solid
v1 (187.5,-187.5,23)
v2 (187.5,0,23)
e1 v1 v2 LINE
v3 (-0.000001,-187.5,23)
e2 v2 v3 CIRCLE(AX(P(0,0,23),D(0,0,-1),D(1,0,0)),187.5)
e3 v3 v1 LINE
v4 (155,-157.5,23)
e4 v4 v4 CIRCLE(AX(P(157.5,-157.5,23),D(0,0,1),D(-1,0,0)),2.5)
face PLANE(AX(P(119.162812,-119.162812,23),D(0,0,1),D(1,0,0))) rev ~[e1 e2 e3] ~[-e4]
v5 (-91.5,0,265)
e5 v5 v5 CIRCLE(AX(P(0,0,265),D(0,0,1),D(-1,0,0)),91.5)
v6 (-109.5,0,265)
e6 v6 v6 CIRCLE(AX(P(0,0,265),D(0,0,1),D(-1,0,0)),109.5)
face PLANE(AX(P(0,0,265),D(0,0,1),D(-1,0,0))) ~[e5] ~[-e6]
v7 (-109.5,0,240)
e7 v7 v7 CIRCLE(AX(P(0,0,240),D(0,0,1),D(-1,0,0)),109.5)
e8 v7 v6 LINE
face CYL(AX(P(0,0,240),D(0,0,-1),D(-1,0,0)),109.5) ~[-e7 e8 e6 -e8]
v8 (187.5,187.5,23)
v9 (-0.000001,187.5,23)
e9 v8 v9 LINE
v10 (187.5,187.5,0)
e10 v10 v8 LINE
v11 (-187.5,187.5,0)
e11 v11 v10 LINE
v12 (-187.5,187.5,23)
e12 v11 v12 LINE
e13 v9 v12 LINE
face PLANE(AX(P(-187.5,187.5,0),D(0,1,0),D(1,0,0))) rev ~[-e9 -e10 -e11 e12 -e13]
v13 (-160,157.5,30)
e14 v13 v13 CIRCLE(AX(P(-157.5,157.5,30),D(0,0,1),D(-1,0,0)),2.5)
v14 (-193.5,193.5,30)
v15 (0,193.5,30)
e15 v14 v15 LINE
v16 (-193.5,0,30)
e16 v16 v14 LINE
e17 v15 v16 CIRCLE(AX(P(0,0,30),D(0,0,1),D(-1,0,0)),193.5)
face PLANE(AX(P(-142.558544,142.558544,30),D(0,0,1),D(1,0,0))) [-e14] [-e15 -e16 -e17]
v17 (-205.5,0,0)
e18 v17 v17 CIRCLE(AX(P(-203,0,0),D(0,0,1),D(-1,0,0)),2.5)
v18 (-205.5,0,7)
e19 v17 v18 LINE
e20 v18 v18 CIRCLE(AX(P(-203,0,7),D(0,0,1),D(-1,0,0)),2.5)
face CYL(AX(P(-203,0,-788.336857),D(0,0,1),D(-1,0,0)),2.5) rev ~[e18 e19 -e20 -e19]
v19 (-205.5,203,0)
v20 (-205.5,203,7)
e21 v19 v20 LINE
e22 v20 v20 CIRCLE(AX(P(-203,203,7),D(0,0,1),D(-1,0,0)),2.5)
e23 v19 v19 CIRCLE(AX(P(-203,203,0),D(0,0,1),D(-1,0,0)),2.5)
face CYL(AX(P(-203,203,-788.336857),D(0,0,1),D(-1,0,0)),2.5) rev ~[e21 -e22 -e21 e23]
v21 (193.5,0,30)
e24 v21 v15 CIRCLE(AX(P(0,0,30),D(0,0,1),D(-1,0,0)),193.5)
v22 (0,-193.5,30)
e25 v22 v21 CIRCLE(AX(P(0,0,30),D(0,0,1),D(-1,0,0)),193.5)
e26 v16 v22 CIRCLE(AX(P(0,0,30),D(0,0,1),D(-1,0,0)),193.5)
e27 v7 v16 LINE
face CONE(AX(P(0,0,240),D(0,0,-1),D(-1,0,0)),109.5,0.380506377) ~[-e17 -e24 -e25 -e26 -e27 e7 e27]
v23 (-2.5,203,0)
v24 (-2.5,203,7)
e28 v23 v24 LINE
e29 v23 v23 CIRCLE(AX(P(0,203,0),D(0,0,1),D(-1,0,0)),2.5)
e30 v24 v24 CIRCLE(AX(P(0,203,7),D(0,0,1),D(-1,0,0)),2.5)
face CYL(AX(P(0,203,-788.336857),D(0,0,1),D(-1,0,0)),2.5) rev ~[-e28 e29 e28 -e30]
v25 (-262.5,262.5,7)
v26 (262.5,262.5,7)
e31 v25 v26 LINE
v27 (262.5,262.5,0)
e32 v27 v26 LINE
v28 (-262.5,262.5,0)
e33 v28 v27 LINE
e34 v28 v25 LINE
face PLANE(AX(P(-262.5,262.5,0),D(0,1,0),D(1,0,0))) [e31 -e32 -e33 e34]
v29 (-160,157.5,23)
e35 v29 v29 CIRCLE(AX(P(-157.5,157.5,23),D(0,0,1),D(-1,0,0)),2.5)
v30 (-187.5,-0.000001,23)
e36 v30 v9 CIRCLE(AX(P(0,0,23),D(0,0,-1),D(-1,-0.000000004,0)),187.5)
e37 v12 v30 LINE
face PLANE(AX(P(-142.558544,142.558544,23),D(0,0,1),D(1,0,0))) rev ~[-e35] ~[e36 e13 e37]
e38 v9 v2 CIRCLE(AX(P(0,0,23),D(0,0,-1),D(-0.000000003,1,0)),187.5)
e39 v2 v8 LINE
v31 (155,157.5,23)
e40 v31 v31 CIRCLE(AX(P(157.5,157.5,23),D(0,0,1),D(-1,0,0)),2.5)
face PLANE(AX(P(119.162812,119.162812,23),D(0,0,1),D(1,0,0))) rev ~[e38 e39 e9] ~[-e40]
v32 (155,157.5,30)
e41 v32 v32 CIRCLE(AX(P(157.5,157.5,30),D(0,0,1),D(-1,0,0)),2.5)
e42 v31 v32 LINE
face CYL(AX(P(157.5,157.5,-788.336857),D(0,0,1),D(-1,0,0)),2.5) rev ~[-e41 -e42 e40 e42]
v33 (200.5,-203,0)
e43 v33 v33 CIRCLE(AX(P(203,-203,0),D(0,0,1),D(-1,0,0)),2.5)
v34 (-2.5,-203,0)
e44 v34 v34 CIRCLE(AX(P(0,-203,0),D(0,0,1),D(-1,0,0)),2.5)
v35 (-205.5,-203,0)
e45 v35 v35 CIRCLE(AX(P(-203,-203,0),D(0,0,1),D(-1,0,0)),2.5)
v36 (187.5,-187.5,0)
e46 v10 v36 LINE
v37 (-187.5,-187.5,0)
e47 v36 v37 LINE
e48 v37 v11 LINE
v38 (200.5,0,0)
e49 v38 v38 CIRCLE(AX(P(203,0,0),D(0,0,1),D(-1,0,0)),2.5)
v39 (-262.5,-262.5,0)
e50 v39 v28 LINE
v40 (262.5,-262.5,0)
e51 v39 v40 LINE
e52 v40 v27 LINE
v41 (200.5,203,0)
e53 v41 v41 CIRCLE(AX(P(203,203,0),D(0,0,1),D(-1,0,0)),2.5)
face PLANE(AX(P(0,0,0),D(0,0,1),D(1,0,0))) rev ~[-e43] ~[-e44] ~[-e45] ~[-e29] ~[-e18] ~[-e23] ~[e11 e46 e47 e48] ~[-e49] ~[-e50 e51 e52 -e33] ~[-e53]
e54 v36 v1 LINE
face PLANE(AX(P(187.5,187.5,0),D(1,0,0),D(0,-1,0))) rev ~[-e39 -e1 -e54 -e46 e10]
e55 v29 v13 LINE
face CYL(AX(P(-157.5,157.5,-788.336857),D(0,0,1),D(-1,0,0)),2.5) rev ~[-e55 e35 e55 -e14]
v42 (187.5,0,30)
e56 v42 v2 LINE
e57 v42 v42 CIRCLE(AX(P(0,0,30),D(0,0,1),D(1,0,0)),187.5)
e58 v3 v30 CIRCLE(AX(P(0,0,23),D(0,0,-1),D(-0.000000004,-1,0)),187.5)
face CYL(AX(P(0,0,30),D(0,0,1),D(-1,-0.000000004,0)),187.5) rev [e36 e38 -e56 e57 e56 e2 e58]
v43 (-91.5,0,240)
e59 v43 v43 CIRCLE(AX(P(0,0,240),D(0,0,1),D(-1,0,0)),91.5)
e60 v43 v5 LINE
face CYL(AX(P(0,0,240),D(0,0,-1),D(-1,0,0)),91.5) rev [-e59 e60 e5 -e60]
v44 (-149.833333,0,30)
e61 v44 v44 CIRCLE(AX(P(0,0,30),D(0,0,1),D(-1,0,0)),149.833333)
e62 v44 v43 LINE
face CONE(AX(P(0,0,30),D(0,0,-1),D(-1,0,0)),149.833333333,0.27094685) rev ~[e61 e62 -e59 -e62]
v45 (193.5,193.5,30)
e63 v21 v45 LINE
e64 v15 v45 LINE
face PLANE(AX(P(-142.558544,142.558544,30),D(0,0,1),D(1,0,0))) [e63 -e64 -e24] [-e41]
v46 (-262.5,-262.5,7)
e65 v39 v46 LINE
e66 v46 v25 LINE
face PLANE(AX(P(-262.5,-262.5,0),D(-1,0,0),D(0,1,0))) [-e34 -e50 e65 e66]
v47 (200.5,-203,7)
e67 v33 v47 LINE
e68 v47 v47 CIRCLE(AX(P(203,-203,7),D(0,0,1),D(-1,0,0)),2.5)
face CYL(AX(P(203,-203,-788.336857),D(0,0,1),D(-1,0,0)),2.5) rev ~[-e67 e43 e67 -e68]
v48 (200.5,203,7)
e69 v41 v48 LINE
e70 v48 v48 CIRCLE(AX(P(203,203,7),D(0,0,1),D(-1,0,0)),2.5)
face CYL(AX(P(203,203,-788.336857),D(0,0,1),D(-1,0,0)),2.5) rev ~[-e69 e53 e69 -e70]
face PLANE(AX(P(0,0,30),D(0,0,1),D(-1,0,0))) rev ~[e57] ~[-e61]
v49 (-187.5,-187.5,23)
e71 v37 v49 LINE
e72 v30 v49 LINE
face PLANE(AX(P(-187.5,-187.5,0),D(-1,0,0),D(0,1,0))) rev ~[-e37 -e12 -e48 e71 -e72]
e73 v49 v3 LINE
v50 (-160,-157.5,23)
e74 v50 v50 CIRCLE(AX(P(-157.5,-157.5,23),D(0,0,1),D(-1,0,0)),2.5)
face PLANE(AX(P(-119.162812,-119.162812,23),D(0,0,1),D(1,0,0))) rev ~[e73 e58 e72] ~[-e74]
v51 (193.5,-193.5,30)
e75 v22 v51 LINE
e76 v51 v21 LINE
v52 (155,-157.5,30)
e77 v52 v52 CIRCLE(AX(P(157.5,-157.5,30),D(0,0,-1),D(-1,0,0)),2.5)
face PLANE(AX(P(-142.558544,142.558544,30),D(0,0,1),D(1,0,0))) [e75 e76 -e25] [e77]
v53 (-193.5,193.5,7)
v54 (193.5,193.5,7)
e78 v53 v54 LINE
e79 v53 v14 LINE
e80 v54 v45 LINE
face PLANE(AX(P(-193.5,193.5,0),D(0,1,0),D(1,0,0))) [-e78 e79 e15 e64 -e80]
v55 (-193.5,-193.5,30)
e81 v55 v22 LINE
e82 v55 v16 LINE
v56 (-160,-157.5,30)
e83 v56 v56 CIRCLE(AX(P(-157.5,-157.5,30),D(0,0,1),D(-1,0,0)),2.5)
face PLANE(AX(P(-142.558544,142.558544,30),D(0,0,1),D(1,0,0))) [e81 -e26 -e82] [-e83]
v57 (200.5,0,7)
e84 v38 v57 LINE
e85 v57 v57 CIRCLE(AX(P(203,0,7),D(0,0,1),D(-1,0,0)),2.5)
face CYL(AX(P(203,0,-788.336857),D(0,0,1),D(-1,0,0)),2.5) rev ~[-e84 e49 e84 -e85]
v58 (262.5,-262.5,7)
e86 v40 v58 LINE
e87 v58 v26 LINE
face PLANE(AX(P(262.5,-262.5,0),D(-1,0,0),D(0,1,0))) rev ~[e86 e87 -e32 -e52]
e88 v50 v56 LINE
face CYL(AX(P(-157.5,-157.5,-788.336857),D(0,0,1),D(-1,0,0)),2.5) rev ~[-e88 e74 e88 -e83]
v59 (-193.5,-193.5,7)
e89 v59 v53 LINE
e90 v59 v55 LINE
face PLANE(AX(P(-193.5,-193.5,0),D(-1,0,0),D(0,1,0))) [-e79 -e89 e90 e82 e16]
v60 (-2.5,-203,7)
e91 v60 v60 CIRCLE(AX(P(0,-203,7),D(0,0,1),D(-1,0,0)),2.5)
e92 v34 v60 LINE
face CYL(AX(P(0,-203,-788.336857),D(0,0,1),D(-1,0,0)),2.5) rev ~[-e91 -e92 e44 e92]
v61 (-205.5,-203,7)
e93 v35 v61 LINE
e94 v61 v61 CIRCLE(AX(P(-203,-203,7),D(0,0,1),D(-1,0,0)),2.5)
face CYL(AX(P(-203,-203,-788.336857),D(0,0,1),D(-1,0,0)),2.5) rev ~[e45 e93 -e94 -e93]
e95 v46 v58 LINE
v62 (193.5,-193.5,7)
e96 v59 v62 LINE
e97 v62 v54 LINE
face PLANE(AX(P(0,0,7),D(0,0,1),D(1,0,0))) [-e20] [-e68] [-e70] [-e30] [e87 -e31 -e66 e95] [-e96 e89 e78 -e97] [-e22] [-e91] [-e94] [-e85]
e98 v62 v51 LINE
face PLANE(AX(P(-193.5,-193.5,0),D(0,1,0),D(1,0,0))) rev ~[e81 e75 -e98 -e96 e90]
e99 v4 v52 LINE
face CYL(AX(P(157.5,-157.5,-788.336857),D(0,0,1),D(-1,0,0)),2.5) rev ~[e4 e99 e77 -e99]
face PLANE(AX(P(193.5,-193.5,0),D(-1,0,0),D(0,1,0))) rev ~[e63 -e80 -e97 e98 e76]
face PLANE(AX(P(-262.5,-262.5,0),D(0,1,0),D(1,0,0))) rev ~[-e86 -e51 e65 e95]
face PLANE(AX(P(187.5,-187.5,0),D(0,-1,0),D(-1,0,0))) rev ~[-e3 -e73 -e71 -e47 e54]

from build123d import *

# Parameters (mm, degrees)
F0_W      = 525
F0_H      = 525
F0_W_2    = 387
F0_H_2    = 387
F1_DEPTH  = 7
F2_DEPTH  = 30
F4_DEPTH  = 7
F7_DEPTH  = 25
F8_D      = 5
F9_D      = 5
F10_D     = 5
F11_D     = 5
F12_D     = 5
F13_R     = 2.5
F13_R_2   = 7.5
F14_DEPTH = 10


# Not quite as in the source:
# - a feature names something its author has since deleted; it is built from what else it names


with BuildPart() as f1:
    # F0 (on Top) → F1 (new body)
    with BuildSketch(Plane.XY):
        Rectangle(F0_W, F0_H)
        Rectangle(F0_W_2, F0_H_2, mode=Mode.SUBTRACT)
    extrude(amount=F1_DEPTH)

    # F0 (on Top) → F2 (join)
    with BuildSketch(Plane.XY):
        Rectangle(F0_W_2, F0_H_2)
        Polygon((-187.5, -6.596e-07), (-187.5, 187.5), (-6.149e-07, 187.5), (187.5, 187.5), (187.5, 0), (187.5, -187.5), (-6.893e-07, -187.5), (-187.5, -187.5), align=None, mode=Mode.SUBTRACT)
    extrude(amount=F2_DEPTH)

    # F3 (on face) → F4 (join)
    with BuildSketch(Plane.XY.offset(30)):
        with BuildLine():
            ThreePointArc((-187.5, 47.8121323515), (-136.8251621596, 136.8251621596), (-47.8121323515, 187.5))
            Line((-47.8121323515, 187.5), (-187.5, 187.5))
            Line((-187.5, 187.5), (-187.5, 47.8121323515))
        make_face()
        with BuildLine():
            ThreePointArc((-6.149e-07, 187.5), (132.5825212551, 132.5825216899), (187.5, 0))
            Line((187.5, 0), (187.5, 47.8121323515))
            ThreePointArc((187.5, 47.8121323515), (136.8251621596, 136.8251621596), (47.8121323515, 187.5))
            Line((47.8121323515, 187.5), (-6.149e-07, 187.5))
        make_face()
        with BuildLine():
            ThreePointArc((-187.5, -6.596e-07), (-132.5825219231, 132.5825210219), (-6.149e-07, 187.5))
            Line((-6.149e-07, 187.5), (-47.8121323515, 187.5))
            ThreePointArc((-47.8121323515, 187.5), (-136.8251621596, 136.8251621596), (-187.5, 47.8121323515))
            Line((-187.5, 47.8121323515), (-187.5, -6.596e-07))
        make_face()
        with BuildLine():
            Line((-47.8121323515, -187.5), (-6.893e-07, -187.5))
            ThreePointArc((-6.893e-07, -187.5), (-132.582521483, -132.582521462), (-187.5, -6.596e-07))
            Line((-187.5, -6.596e-07), (-187.5, -47.8121323515))
            ThreePointArc((-187.5, -47.8121323515), (-136.8251621596, -136.8251621596), (-47.8121323515, -187.5))
        make_face()
        with BuildLine():
            Line((187.5, -47.8121323515), (187.5, 0))
            ThreePointArc((187.5, 0), (132.5825212288, -132.5825217162), (-6.893e-07, -187.5))
            Line((-6.893e-07, -187.5), (47.8121323515, -187.5))
            ThreePointArc((47.8121323515, -187.5), (136.8251621596, -136.8251621596), (187.5, -47.8121323515))
        make_face()
        with BuildLine():
            ThreePointArc((47.8121323515, 187.5), (136.8251621596, 136.8251621596), (187.5, 47.8121323515))
            Line((187.5, 47.8121323515), (187.5, 187.5))
            Line((187.5, 187.5), (47.8121323515, 187.5))
        make_face()
        with BuildLine():
            Line((187.5, -187.5), (187.5, -47.8121323515))
            ThreePointArc((187.5, -47.8121323515), (136.8251621596, -136.8251621596), (47.8121323515, -187.5))
            Line((47.8121323515, -187.5), (187.5, -187.5))
        make_face()
        with BuildLine():
            Line((-187.5, -187.5), (-47.8121323515, -187.5))
            ThreePointArc((-47.8121323515, -187.5), (-136.8251621596, -136.8251621596), (-187.5, -47.8121323515))
            Line((-187.5, -47.8121323515), (-187.5, -187.5))
        make_face()
    extrude(amount=-F4_DEPTH)

    # F5 (on Front) → F6 (revolve)
    with BuildSketch(Plane.XZ):
        Polygon((-109.5, 240), (-193.5, 30), (-149.8333333333, 30), (-91.5, 240), align=None)
    revolve(axis=Axis((0, 0, 120), (0, 0, 1)))

    # F7 (add): a face of the model
    f7_faces = [f1.faces().sort_by_distance(p)[0] for p in [
        (94.5971277016, 0, 240),
    ]]
    extrude(f7_faces, amount=F7_DEPTH)

    # F8 (through all)
    with Locations(Plane(origin=(0, 0, 0), x_dir=(1, 0, 0), z_dir=(0, 0, -1))):
        with Locations((-157.5, -157.5)):
            Hole(F8_D / 2)

    # F9 (through all)
    with Locations(Plane(origin=(0, 0, 0), x_dir=(1, 0, 0), z_dir=(0, 0, -1))):
        with Locations((157.5, -157.5)):
            Hole(F9_D / 2)

    # F10 (through all)
    with Locations(Plane(origin=(0, 0, 0), x_dir=(1, 0, 0), z_dir=(0, 0, -1))):
        with Locations((-157.5, 157.5)):
            Hole(F10_D / 2)

    # F11 (through all)
    with Locations(Plane(origin=(0, 0, 0), x_dir=(1, 0, 0), z_dir=(0, 0, -1))):
        with Locations((157.5, 157.5)):
            Hole(F11_D / 2)

    # F12 (through all)
    with Locations(Plane(origin=(0, 0, 0), x_dir=(1, 0, 0), z_dir=(0, 0, -1))):
        with Locations((-203, -203), (0, -203), (203, -203), (203, 0), (203, 203), (0, 203), (-203, 203), (-203, 0)):
            Hole(F12_D / 2)

    # F13 (on face) → F14 (cut)
    with BuildSketch(Plane.XY.offset(30)):
        with Locations((157.5, -157.5)):
            Circle(F13_R)
        with Locations((-157.5, -157.5)):
            Circle(F13_R_2)
        with Locations((-157.5, 157.5)):
            Circle(F13_R_2)
        with Locations((157.5, 157.5)):
            Circle(F13_R_2)
    extrude(amount=F14_DEPTH, mode=Mode.SUBTRACT)


solid = f1.part
